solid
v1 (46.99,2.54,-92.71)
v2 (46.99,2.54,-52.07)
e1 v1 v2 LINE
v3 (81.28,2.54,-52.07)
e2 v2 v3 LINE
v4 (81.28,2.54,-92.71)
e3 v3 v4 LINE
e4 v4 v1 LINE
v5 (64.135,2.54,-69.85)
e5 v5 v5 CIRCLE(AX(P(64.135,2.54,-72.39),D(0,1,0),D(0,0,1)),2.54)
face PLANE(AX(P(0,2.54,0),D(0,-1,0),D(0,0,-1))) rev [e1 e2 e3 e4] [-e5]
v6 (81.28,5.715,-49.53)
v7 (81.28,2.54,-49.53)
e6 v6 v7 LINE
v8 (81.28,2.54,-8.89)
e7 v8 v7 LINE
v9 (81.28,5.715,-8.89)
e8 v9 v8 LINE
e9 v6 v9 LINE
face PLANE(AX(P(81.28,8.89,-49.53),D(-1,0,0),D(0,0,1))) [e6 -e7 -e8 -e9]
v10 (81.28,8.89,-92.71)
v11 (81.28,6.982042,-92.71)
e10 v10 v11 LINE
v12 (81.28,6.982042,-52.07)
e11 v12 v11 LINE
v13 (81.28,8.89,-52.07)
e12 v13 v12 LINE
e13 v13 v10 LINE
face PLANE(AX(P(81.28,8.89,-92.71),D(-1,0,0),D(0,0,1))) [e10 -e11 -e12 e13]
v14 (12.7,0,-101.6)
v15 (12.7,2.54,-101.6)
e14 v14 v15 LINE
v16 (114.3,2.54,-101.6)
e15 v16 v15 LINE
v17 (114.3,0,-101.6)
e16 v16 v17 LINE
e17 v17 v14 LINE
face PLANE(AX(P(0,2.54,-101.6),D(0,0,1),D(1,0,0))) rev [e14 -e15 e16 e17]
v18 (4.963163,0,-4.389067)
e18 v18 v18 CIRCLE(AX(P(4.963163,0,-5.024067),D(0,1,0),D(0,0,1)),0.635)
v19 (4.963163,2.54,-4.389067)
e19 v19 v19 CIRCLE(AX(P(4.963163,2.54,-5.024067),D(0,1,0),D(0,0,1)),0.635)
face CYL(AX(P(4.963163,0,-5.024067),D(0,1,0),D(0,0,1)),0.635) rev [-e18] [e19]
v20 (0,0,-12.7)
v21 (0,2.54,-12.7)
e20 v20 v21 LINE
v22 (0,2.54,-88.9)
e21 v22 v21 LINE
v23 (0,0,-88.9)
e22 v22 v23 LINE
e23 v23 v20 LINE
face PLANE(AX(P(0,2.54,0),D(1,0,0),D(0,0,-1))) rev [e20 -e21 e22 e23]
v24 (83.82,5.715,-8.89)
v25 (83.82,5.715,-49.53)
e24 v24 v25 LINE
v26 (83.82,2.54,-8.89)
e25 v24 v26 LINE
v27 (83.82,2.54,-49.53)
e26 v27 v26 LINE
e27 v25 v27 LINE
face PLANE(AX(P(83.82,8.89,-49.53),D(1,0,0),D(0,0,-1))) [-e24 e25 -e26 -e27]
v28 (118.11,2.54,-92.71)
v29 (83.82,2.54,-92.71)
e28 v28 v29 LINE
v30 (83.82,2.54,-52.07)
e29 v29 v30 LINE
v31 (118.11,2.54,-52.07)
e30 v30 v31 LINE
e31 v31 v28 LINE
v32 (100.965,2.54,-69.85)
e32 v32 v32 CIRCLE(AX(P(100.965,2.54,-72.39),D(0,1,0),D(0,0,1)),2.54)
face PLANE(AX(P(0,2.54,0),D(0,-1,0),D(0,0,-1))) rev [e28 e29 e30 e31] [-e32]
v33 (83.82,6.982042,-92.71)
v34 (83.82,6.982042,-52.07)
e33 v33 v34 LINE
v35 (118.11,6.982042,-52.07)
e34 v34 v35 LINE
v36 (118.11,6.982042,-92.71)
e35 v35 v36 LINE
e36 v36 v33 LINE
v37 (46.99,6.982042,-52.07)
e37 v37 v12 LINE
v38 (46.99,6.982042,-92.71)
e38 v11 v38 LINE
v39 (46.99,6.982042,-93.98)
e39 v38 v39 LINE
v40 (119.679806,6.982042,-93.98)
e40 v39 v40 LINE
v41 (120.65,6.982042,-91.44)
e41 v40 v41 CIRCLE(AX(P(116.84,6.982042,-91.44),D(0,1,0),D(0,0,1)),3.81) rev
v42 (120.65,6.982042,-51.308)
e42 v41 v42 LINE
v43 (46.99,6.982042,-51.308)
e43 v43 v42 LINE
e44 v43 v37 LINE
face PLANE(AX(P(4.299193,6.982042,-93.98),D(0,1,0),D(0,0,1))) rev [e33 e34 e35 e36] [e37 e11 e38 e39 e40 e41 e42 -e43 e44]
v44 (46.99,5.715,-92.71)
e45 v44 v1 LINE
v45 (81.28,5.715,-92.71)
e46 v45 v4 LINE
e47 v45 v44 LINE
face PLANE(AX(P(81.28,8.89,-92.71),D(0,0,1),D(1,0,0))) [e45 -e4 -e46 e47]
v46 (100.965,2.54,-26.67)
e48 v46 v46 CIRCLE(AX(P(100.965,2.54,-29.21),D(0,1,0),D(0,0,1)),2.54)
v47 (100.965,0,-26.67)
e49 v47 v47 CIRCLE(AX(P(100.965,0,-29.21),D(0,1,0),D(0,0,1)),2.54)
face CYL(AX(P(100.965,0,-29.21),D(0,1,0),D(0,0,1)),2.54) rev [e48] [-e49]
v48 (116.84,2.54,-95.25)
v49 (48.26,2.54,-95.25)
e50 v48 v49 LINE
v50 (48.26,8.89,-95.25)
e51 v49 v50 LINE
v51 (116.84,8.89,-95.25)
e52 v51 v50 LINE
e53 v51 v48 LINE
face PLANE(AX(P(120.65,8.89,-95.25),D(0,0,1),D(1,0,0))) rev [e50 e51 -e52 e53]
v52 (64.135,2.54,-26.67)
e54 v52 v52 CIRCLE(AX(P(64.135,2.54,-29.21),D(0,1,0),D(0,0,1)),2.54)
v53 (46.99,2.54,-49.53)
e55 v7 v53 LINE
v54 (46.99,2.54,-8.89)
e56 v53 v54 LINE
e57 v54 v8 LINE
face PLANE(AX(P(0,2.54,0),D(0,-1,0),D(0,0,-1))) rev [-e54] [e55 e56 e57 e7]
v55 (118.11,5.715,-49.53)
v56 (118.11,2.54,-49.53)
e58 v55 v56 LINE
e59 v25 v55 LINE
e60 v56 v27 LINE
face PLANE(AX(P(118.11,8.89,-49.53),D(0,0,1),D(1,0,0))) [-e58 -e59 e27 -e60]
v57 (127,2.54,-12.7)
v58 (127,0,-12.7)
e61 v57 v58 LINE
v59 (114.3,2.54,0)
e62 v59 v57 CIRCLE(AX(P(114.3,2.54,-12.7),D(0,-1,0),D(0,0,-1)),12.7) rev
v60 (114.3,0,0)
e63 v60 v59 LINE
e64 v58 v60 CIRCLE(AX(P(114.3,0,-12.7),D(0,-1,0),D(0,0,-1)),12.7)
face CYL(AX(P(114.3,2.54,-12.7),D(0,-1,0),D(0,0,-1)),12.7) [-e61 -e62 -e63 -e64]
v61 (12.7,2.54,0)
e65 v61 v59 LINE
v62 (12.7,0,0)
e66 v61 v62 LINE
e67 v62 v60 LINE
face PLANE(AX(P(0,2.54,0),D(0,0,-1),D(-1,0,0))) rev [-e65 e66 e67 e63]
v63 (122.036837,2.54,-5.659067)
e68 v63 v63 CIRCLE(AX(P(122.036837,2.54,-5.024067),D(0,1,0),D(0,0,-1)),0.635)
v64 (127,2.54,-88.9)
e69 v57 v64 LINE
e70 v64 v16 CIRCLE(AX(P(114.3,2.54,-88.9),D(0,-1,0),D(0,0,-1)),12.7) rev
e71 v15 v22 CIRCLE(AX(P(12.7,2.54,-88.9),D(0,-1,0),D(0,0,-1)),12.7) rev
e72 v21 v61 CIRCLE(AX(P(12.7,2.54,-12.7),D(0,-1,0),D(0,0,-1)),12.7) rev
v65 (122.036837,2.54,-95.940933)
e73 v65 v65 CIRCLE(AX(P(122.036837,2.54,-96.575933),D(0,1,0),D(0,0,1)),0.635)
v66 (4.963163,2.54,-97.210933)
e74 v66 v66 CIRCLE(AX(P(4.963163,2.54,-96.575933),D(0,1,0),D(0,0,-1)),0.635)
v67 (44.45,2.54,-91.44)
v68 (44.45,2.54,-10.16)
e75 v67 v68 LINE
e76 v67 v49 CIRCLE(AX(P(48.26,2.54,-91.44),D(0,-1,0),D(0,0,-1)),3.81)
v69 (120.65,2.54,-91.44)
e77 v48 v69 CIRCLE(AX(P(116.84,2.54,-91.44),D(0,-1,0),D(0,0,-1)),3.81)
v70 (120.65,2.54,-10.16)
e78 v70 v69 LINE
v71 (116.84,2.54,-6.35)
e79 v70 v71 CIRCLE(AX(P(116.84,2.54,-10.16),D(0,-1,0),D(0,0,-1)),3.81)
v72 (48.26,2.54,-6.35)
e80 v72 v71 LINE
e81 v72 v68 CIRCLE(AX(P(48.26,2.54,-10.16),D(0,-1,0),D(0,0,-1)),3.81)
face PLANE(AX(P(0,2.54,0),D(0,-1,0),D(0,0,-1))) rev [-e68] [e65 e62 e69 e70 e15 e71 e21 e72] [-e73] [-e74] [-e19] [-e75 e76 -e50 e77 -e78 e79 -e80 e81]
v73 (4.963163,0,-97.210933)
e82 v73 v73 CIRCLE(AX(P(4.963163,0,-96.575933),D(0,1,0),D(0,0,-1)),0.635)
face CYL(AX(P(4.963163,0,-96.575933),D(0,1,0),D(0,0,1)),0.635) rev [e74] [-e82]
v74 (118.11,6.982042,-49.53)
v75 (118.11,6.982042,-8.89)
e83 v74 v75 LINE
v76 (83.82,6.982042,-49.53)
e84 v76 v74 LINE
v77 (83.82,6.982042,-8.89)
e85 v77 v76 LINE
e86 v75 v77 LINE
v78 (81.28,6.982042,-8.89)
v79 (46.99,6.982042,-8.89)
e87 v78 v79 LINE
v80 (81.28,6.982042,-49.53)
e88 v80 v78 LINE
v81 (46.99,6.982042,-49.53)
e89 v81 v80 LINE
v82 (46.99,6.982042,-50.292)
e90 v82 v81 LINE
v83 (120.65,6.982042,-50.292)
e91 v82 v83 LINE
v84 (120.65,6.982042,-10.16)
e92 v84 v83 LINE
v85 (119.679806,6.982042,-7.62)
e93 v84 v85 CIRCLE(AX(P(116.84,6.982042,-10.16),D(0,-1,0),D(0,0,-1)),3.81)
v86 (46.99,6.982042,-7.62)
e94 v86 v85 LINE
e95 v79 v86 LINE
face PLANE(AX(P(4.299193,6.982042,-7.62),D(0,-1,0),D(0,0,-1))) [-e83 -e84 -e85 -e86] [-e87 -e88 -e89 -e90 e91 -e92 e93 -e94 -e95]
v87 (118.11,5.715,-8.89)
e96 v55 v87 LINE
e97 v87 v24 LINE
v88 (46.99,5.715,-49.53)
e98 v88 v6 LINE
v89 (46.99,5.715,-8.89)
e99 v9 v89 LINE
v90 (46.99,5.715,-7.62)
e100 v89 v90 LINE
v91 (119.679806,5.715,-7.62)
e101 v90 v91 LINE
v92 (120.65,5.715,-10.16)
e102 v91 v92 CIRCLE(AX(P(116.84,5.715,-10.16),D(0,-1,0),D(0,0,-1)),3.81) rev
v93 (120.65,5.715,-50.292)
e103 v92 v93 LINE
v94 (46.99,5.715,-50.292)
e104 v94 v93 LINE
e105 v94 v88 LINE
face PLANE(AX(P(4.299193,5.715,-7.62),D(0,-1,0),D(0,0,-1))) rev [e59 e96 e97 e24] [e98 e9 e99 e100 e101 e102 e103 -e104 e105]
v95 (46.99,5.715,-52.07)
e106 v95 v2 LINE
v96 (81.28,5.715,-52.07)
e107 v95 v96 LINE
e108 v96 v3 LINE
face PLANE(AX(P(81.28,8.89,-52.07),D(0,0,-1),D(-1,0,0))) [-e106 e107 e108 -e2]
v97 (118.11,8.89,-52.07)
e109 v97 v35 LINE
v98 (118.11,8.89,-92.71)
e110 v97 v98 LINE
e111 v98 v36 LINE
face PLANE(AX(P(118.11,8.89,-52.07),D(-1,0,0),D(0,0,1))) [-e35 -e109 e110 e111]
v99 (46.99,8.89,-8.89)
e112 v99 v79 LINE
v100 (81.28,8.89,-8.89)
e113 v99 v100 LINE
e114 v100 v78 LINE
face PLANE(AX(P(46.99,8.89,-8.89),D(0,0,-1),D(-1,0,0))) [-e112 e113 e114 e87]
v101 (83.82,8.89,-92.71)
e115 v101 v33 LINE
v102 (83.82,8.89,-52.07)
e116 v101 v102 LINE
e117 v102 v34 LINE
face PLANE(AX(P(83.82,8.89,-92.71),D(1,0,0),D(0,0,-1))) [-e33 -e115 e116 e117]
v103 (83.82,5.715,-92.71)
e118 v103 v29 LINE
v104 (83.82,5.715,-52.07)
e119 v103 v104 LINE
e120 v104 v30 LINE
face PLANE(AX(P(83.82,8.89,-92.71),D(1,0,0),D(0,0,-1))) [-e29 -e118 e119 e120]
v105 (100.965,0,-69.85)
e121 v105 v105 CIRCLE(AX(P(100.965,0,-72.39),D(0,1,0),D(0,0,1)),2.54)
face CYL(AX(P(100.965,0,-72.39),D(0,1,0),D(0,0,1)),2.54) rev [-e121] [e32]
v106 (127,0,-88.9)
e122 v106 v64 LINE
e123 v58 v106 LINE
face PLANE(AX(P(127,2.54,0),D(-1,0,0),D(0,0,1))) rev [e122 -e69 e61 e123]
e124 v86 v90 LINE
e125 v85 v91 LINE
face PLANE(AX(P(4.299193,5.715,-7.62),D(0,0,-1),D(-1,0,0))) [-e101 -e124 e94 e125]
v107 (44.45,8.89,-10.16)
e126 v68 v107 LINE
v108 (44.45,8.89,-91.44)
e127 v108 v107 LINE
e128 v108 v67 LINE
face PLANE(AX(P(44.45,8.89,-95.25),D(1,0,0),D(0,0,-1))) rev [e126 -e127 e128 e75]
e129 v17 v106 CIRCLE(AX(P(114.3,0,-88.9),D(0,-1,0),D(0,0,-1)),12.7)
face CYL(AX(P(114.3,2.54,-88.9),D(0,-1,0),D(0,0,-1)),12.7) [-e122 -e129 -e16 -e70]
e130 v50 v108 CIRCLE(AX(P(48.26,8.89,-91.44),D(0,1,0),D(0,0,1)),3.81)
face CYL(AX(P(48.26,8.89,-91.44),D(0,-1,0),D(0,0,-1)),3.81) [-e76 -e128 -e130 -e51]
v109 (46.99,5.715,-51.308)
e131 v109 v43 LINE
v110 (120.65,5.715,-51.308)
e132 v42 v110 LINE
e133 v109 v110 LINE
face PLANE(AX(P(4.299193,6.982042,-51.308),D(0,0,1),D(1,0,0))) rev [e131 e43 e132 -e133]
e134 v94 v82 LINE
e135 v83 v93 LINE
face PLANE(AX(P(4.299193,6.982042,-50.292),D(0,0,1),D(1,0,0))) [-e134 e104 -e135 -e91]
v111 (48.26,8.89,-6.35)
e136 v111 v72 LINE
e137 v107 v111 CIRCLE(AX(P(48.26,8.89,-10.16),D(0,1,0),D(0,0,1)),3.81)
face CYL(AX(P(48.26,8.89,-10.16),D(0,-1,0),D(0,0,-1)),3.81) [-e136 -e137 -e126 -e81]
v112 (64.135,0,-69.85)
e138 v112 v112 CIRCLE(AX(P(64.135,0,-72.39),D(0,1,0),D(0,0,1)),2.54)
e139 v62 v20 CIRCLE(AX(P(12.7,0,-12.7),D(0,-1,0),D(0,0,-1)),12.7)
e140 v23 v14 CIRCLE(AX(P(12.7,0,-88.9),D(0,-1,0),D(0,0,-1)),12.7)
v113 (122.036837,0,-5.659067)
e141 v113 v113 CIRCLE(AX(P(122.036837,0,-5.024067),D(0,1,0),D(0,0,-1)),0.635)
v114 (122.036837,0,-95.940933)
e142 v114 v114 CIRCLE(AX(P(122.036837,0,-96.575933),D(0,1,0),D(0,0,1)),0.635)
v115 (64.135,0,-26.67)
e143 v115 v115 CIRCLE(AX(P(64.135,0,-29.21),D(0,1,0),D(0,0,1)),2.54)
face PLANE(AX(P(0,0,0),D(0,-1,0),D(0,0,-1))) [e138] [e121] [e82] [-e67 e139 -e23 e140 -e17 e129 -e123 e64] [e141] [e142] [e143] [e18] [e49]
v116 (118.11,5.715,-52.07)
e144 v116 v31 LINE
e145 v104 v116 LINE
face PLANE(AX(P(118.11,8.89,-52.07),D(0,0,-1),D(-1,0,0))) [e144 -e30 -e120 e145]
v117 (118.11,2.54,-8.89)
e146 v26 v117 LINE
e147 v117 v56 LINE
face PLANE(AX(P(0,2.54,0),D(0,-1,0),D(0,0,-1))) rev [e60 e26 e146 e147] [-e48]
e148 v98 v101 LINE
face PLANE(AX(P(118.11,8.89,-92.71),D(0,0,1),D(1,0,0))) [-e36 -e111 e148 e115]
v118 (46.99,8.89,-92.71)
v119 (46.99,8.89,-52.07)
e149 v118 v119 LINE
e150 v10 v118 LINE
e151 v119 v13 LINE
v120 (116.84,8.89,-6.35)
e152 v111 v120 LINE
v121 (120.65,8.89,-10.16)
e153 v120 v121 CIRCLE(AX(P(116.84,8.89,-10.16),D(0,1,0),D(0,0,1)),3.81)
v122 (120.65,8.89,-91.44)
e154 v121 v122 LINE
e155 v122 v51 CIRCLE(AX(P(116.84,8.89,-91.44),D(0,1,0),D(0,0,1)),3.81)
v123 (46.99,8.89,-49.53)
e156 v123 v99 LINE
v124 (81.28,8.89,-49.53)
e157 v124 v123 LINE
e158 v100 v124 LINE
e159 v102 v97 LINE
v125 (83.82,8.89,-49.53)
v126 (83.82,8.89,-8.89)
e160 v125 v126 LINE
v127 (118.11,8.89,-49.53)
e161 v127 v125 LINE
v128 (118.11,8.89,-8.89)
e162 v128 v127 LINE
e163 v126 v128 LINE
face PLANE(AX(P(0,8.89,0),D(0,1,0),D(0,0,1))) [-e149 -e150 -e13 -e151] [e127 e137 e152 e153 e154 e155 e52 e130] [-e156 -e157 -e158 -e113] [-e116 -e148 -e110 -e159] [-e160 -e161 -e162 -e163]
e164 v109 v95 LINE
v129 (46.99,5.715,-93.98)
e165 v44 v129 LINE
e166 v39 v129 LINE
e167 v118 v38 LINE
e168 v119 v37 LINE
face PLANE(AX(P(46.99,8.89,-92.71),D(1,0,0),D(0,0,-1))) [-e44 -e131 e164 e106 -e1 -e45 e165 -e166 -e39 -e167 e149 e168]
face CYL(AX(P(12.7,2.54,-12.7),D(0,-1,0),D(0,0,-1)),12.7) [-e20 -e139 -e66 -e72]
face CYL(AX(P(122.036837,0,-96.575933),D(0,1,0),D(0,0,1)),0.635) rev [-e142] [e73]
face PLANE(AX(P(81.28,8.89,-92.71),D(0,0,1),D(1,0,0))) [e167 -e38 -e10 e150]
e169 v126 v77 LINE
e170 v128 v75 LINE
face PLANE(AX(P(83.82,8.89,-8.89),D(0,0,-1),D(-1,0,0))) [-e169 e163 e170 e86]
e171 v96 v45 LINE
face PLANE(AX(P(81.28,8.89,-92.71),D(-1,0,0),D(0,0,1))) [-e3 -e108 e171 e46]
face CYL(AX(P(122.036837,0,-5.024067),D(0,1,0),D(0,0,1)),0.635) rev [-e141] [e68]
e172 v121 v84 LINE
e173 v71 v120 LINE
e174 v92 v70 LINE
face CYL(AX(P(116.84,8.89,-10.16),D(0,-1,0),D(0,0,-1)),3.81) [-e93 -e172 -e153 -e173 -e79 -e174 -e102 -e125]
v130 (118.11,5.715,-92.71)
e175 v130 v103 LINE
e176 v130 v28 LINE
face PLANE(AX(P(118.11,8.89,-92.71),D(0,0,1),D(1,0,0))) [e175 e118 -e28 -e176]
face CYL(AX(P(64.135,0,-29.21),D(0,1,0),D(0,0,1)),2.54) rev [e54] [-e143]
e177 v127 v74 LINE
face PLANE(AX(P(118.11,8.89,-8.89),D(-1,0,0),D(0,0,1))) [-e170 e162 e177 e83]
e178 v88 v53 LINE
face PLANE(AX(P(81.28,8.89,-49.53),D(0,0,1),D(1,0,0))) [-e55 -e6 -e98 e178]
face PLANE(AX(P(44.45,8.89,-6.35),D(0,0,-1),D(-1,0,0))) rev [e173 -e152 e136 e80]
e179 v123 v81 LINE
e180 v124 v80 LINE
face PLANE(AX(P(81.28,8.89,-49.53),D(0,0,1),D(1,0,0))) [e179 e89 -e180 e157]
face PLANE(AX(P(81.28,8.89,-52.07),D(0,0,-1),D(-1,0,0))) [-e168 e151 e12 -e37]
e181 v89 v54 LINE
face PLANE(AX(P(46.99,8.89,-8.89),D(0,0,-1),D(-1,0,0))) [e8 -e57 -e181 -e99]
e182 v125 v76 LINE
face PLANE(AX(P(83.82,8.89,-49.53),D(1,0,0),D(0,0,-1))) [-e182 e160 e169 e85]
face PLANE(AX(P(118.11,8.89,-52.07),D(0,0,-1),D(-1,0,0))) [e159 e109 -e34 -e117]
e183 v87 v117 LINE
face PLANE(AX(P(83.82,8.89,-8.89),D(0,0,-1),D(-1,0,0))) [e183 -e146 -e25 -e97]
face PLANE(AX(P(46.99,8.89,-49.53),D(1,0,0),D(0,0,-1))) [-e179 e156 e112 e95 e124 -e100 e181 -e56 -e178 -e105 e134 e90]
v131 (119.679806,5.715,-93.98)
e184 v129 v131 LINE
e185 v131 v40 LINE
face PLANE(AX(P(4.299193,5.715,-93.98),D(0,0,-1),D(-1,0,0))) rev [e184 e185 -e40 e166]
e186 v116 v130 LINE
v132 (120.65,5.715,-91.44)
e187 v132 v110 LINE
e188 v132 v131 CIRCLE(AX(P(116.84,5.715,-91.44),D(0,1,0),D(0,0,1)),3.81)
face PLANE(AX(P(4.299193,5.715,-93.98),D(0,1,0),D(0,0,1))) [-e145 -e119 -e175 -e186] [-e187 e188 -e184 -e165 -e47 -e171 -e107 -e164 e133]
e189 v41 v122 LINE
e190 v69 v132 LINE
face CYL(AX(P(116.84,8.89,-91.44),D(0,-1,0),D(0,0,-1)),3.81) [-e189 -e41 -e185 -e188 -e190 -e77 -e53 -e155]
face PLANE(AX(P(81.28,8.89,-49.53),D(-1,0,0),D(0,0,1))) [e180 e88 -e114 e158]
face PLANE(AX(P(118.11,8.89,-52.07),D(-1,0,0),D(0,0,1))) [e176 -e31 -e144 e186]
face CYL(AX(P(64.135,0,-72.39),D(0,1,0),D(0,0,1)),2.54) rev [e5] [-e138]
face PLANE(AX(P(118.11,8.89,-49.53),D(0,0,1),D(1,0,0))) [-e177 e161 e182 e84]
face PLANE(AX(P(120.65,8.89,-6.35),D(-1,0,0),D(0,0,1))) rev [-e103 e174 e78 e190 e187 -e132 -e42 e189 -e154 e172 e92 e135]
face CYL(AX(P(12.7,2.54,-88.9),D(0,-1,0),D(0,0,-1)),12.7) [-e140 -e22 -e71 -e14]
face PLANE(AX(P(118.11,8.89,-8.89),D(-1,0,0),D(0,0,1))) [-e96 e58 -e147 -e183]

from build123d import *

# Parameters (mm, degrees)
SKETCH1_W           = 127
SKETCH1_H           = 101.6
BOSS_EXTRUDE1_DEPTH = 2.54
SKETCH2_W           = 76.2
SKETCH2_H           = 88.9
SKETCH2_W_2         = 34.29
SKETCH2_H_2         = 40.64
BOSS_EXTRUDE2_DEPTH = 6.35
SKETCH3_R           = 2.54
CUT_EXTRUDE1_DEPTH  = 163.763271348
CUT_EXTRUDE2_REACH  = 159.981
SKETCH4_W           = 42.672
SKETCH4_H           = 1.267041817
FILLET1_R           = 3.81
FILLET2_R           = 12.7
SKETCH5_R           = 0.635
CUT_EXTRUDE3_DEPTH  = 163.763271348


with BuildPart() as part:
    # Sketch1 → Boss-Extrude1 (new body)
    with BuildSketch(Plane(origin=(0, 0, 0), x_dir=(1, 0, 0), z_dir=(0, 1, 0))):
        with Locations((63.5, 50.8)):
            Rectangle(SKETCH1_W, SKETCH1_H)
    extrude(amount=BOSS_EXTRUDE1_DEPTH)

    # Sketch2 → Boss-Extrude2 (add)
    with BuildSketch(Plane(origin=(0, 2.54, 0), x_dir=(1, 0, 0), z_dir=(0, 1, 0))):
        with Locations((82.55, 50.8)):
            Rectangle(SKETCH2_W, SKETCH2_H)
        with Locations((64.135, 72.39)):
            Rectangle(SKETCH2_W_2, SKETCH2_H_2, mode=Mode.SUBTRACT)
        with Locations((64.135, 29.21)):
            Rectangle(SKETCH2_W_2, SKETCH2_H_2, mode=Mode.SUBTRACT)
        with Locations((100.965, 29.21)):
            Rectangle(SKETCH2_W_2, SKETCH2_H_2, mode=Mode.SUBTRACT)
        with Locations((100.965, 72.39)):
            Rectangle(SKETCH2_W_2, SKETCH2_H_2, mode=Mode.SUBTRACT)
    extrude(amount=BOSS_EXTRUDE2_DEPTH)

    # Sketch3 → Cut-Extrude1 (cut, through all)
    with BuildSketch(Plane(origin=(0, 2.54, 0), x_dir=(1, 0, 0), z_dir=(0, 1, 0))):
        with Locations(Location((64.135, 72.39, 0), (0, 0, 270))):
            Circle(SKETCH3_R)
        with Locations(Location((100.965, 72.39, 0), (0, 0, 270))):
            Circle(SKETCH3_R)
        with Locations(Location((64.135, 29.21, 0), (0, 0, 270))):
            Circle(SKETCH3_R)
        with Locations(Location((100.965, 29.21, 0), (0, 0, 270))):
            Circle(SKETCH3_R)
    extrude(amount=-CUT_EXTRUDE1_DEPTH, mode=Mode.SUBTRACT)

    # Cut-Extrude2: up to this face of the body (flat: up to its plane)
    cut_extrude2_end = Plane(part.part.faces().sort_by_distance((46.99, 5.715, -29.21))[0])
    # Sketch4 → Cut-Extrude2 (cut, up to the picked face)
    with BuildSketch(Plane(origin=(120.65, 0, 0), x_dir=(0, 0, -1), z_dir=(1, 0, 0)), mode=Mode.PRIVATE) as cut_extrude2_sk1:
        with Locations((72.644, 6.348520909)):
            Rectangle(SKETCH4_W, SKETCH4_H)
    cut_extrude2_tool1 = split(extrude(cut_extrude2_sk1.sketch, amount=-CUT_EXTRUDE2_REACH, mode=Mode.PRIVATE), bisect_by=cut_extrude2_end, keep=Keep.BOTH, mode=Mode.PRIVATE)
    # Sketch4 → Cut-Extrude2 (cut, up to the picked face)
    with BuildSketch(Plane(origin=(120.65, 0, 0), x_dir=(0, 0, -1), z_dir=(1, 0, 0)), mode=Mode.PRIVATE) as cut_extrude2_sk2:
        with Locations((28.956, 6.348520909)):
            Rectangle(SKETCH4_W, SKETCH4_H)
    cut_extrude2_tool2 = split(extrude(cut_extrude2_sk2.sketch, amount=-CUT_EXTRUDE2_REACH, mode=Mode.PRIVATE), bisect_by=cut_extrude2_end, keep=Keep.BOTH, mode=Mode.PRIVATE)
    add(cut_extrude2_tool1.solids().sort_by(Axis((120.65, 6.348521, -72.644), (-1, 0, 0)))[0], mode=Mode.SUBTRACT)
    add(cut_extrude2_tool2.solids().sort_by(Axis((120.65, 6.348521, -28.956), (-1, 0, 0)))[0], mode=Mode.SUBTRACT)

    # Fillet1
    # the kernel refuses this fillet: 3.81 mm, written as the material it takes off along each edge
    with BuildSketch(Plane(origin=(120.65, 2.54, -95.25), x_dir=(0, 0, 1), z_dir=(0, 1, 0)), Plane(origin=(120.65, 2.54, -6.35), x_dir=(-1, 0, 0), z_dir=(0, 1, 0)), Plane(origin=(44.45, 2.54, -6.35), x_dir=(0, 0, -1), z_dir=(0, 1, 0))) as fillet1_piece_1:
        with BuildLine():
            CenterArc((FILLET1_R, -FILLET1_R), FILLET1_R, 90, 90)
            Line((0, -FILLET1_R), (0, 0))
            Line((0, 0), (FILLET1_R, 0))
        make_face()
    extrude(amount=15.875, mode=Mode.SUBTRACT)
    with BuildSketch(Plane(origin=(44.45, 2.54, -95.25), x_dir=(0, 0, 1), z_dir=(0, 1, 0))) as fillet1_piece_2:
        with BuildLine():
            CenterArc((FILLET1_R, FILLET1_R), FILLET1_R, 180, 90)
            Line((0, FILLET1_R), (0, 0))
            Line((0, 0), (FILLET1_R, 0))
        make_face()
    extrude(amount=15.875, mode=Mode.SUBTRACT)

    # Fillet2
    fillet2_edges = [part.edges().sort_by_distance(p)[0] for p in [
        (0, 1.27, -101.6),
        (127, 1.27, -101.6),
        (127, 1.27, 0),
        (0, 1.27, 0),
    ]]
    fillet(fillet2_edges, radius=FILLET2_R)

    # Sketch5 → Cut-Extrude3 (cut, through all)
    with BuildSketch(Plane(origin=(0, 2.54, 0), x_dir=(1, 0, 0), z_dir=(0, 1, 0))):
        with Locations(Location((4.963162708, 5.024067494, 0), (0, 0, 270))):
            Circle(SKETCH5_R)
        with Locations(Location((122.036837292, 5.024067494, 0), (0, 0, 90))):
            Circle(SKETCH5_R)
        with Locations(Location((122.036837292, 96.575932506, 0), (0, 0, 270))):
            Circle(SKETCH5_R)
        with Locations(Location((4.963162708, 96.575932506, 0), (0, 0, 90))):
            Circle(SKETCH5_R)
    extrude(amount=-CUT_EXTRUDE3_DEPTH, mode=Mode.SUBTRACT)


solid = part.part
